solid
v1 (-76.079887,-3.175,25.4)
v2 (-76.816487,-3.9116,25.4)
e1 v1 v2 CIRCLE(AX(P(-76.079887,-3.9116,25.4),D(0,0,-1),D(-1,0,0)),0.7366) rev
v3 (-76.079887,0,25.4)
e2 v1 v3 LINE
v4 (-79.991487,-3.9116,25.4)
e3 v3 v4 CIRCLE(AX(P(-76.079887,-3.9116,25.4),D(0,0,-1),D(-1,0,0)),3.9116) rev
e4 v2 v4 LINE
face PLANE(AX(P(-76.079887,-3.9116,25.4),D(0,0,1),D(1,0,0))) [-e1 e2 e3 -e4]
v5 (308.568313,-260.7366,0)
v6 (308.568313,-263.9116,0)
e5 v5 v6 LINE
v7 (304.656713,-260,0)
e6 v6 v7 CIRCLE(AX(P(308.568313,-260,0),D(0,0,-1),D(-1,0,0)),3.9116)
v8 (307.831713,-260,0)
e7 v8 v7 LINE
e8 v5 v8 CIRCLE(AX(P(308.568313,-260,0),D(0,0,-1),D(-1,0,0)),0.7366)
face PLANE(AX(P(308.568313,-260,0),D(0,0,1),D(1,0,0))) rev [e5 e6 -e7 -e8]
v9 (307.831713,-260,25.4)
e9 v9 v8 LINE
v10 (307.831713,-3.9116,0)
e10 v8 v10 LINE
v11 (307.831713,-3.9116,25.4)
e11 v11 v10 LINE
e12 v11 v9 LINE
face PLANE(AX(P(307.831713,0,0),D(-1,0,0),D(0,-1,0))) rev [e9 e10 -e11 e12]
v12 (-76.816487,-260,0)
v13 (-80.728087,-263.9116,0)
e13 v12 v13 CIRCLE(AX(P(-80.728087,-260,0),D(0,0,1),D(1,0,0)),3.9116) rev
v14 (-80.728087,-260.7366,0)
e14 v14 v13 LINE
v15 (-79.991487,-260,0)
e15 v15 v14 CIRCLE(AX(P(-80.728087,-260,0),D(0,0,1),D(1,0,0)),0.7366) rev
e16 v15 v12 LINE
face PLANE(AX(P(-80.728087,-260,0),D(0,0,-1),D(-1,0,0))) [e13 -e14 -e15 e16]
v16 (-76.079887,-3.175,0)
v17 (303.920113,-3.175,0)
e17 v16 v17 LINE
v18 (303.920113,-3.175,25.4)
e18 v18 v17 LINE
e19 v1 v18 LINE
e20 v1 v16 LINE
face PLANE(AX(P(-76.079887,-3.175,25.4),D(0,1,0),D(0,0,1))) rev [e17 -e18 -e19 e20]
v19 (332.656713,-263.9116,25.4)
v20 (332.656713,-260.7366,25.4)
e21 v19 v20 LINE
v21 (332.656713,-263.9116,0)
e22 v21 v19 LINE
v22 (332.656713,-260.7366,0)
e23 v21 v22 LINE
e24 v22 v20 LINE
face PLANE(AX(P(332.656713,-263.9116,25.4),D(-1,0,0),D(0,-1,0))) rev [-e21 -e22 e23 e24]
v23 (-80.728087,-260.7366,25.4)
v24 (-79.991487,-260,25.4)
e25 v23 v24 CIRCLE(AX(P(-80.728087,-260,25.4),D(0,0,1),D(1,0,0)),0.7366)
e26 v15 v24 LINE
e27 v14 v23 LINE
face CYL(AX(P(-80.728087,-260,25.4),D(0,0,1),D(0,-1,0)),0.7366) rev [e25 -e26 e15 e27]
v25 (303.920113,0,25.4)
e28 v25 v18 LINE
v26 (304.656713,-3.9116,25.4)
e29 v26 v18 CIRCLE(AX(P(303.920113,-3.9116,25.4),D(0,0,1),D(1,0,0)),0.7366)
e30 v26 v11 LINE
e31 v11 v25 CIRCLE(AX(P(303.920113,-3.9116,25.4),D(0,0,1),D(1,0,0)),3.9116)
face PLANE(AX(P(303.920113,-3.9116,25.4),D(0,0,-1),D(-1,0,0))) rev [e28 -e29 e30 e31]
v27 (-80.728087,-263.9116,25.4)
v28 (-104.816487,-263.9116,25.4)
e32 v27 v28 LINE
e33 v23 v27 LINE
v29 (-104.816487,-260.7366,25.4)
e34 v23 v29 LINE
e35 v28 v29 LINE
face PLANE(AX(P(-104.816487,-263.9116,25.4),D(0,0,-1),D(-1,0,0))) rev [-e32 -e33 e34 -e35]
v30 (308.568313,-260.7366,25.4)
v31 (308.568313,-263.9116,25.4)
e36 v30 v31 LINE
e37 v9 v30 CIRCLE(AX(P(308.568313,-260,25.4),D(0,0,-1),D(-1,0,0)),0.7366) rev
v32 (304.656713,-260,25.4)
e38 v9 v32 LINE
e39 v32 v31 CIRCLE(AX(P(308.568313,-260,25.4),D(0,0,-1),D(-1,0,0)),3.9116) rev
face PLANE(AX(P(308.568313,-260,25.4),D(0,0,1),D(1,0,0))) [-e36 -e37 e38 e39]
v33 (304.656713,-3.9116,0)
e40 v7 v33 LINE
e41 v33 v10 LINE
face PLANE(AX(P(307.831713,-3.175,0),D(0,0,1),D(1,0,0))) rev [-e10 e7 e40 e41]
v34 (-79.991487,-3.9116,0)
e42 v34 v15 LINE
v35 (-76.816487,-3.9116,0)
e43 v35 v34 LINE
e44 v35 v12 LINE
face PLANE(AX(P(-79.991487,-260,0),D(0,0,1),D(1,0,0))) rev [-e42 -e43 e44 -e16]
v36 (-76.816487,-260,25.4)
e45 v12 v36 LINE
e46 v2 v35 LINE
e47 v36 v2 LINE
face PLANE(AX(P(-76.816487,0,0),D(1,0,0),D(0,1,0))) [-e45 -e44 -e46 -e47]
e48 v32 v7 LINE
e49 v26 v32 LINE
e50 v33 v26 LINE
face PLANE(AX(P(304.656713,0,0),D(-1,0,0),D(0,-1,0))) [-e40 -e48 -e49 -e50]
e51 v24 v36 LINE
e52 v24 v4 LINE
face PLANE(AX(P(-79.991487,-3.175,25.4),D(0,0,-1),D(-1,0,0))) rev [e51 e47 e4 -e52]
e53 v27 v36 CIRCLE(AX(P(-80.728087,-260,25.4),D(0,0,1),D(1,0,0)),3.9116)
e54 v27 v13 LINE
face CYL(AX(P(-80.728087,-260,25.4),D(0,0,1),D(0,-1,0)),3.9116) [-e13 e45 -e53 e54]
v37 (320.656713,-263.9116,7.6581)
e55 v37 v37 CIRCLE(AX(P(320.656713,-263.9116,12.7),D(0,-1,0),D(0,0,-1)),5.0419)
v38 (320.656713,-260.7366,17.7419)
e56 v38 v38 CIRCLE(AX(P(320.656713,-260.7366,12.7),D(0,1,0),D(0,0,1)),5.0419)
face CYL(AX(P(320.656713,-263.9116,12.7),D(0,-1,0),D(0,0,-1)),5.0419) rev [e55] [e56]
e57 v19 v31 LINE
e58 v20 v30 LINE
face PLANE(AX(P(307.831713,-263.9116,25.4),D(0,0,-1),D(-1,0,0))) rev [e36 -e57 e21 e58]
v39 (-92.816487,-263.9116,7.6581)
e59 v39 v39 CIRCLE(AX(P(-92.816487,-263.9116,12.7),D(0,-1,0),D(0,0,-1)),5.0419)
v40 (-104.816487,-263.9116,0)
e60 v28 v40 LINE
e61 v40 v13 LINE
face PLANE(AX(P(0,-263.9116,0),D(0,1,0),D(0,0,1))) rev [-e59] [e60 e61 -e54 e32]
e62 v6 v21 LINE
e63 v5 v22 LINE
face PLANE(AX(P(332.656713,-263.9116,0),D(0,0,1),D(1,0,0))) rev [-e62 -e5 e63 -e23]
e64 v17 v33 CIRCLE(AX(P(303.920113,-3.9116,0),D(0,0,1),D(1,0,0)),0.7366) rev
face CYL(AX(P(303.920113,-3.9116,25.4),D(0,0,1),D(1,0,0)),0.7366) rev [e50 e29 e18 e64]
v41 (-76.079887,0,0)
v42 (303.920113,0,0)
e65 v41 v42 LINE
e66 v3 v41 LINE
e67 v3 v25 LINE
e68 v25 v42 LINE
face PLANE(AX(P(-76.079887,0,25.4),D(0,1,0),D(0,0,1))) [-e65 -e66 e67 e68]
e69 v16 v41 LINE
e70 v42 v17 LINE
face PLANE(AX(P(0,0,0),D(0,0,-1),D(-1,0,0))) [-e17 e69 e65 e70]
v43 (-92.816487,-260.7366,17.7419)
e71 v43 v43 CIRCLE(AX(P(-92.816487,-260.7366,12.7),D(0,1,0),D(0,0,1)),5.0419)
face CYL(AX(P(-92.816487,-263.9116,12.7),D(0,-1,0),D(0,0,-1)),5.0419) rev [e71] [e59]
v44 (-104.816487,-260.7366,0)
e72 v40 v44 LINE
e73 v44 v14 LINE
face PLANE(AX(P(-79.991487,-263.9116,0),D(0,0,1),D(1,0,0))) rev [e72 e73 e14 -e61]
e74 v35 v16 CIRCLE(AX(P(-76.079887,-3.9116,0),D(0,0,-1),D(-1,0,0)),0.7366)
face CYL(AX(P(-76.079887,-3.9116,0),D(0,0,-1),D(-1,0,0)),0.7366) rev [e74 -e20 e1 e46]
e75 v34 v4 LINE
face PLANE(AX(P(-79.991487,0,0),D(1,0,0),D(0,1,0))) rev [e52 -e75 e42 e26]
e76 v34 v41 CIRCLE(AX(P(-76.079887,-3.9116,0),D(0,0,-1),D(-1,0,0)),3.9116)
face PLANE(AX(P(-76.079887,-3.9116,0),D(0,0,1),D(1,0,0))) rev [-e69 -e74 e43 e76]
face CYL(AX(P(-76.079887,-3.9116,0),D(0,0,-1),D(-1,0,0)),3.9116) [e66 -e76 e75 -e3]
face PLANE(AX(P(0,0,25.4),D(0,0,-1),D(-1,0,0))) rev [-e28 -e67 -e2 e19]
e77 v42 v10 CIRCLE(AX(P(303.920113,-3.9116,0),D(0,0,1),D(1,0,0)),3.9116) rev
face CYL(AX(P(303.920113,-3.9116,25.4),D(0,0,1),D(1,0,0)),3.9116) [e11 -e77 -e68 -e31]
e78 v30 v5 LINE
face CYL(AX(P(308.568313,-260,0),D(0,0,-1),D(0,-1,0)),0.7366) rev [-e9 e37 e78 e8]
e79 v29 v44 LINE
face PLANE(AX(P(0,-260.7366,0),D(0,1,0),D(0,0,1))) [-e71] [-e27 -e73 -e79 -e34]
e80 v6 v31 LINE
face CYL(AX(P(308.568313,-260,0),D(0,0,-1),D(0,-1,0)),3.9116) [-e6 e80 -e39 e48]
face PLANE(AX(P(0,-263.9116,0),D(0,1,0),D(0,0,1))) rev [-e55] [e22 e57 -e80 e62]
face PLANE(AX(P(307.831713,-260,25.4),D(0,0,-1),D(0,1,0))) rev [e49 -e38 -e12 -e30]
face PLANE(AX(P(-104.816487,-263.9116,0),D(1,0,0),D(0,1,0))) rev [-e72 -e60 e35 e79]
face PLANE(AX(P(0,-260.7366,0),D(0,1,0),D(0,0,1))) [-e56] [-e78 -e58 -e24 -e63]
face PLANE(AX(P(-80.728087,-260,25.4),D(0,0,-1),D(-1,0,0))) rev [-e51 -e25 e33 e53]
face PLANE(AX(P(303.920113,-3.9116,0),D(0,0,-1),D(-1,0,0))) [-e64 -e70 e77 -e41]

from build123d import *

# Parameters (mm, degrees)
CROQUIS1_W                    = 380
CROQUIS1_H                    = 3.175
BRIDA_BASE1_DEPTH             = 25.4
BRIDA_DE_ARISTA1_DEPTH        = 25.4
BRIDA_DE_ARISTA1_BEND_DEPTH   = 25.4
BRIDA_DE_ARISTA2_DEPTH        = 25.4
BRIDA_DE_ARISTA2_BEND_DEPTH   = 25.4
TALADRO_DE_MARGEN_PARA_3_81_D = 10.0838


# Sheet-metal steps are written as plain solids
with BuildPart() as part:
    # Croquis1 → Brida base1 (new body)
    with BuildSketch(Plane.XY):
        with Locations((113.920112782, -1.5875)):
            Rectangle(CROQUIS1_W, CROQUIS1_H)
    extrude(amount=BRIDA_BASE1_DEPTH)

    # Brida de arista1 section (across the edge) → Brida de arista1 (add)
    with BuildSketch(Plane(origin=(304.656712782, -3.175, 0), x_dir=(-1, 0, 0), z_dir=(0, 0, 1))):
        with BuildLine():
            Line((-3.175, 0.7366), (-3.175, 256.825))
            Line((-3.175, 256.825), (0, 256.825))
            Line((0, 256.825), (0, 0.7366))
            ThreePointArc((0, 0.7366), (0.215745145, 0.215745145), (0.7366, 0))
            Line((0.7366, 0), (0.7366, -3.175))
            ThreePointArc((0.7366, -3.175), (-2.029318885, -2.029318885), (-3.175, 0.7366))
        make_face()
    extrude(amount=BRIDA_DE_ARISTA1_DEPTH)

    # Brida de arista1 section 2 (across the edge) → Brida de arista1 bend (add)
    with BuildSketch(Plane(origin=(-76.816487218, -3.175, 25.4), x_dir=(1, 0, 0), z_dir=(0, 0, -1))):
        with BuildLine():
            Line((-3.175, 0.7366), (-3.175, 256.825))
            Line((-3.175, 256.825), (0, 256.825))
            Line((0, 256.825), (0, 0.7366))
            ThreePointArc((0, 0.7366), (0.215745145, 0.215745145), (0.7366, 0))
            Line((0.7366, 0), (0.7366, -3.175))
            ThreePointArc((0.7366, -3.175), (-2.029318885, -2.029318885), (-3.175, 0.7366))
        make_face()
    extrude(amount=BRIDA_DE_ARISTA1_BEND_DEPTH)

    # Brida de arista2 section (across the edge) → Brida de arista2 (add)
    with BuildSketch(Plane(origin=(307.831712782, -260.7366, 25.4), x_dir=(0, 1, 0), z_dir=(0, 0, -1))):
        with BuildLine():
            Line((-3.175, 0.7366), (-3.175, 24.825))
            Line((-3.175, 24.825), (0, 24.825))
            Line((0, 24.825), (0, 0.7366))
            ThreePointArc((0, 0.7366), (0.215745145, 0.215745145), (0.7366, 0))
            Line((0.7366, 0), (0.7366, -3.175))
            ThreePointArc((0.7366, -3.175), (-2.029318885, -2.029318885), (-3.175, 0.7366))
        make_face()
    extrude(amount=BRIDA_DE_ARISTA2_DEPTH)

    # Brida de arista2 section 2 (across the edge) → Brida de arista2 bend (add)
    with BuildSketch(Plane(origin=(-79.991487218, -260.7366, 0), x_dir=(0, 1, 0), z_dir=(0, 0, 1))):
        with BuildLine():
            Line((-3.175, 0.7366), (-3.175, 24.825))
            Line((-3.175, 24.825), (0, 24.825))
            Line((0, 24.825), (0, 0.7366))
            ThreePointArc((0, 0.7366), (0.215745145, 0.215745145), (0.7366, 0))
            Line((0.7366, 0), (0.7366, -3.175))
            ThreePointArc((0.7366, -3.175), (-2.029318885, -2.029318885), (-3.175, 0.7366))
        make_face()
    extrude(amount=BRIDA_DE_ARISTA2_BEND_DEPTH)

    # Taladro de margen para 3/81 (through all)
    with Locations(Plane(origin=(0, -263.9116, 0), x_dir=(-1, 0, 0), z_dir=(0, -1, 0))):
        with Locations((92.816487218, -12.7), (-320.656712782, -12.7)):
            Hole(TALADRO_DE_MARGEN_PARA_3_81_D / 2)


solid = part.part
